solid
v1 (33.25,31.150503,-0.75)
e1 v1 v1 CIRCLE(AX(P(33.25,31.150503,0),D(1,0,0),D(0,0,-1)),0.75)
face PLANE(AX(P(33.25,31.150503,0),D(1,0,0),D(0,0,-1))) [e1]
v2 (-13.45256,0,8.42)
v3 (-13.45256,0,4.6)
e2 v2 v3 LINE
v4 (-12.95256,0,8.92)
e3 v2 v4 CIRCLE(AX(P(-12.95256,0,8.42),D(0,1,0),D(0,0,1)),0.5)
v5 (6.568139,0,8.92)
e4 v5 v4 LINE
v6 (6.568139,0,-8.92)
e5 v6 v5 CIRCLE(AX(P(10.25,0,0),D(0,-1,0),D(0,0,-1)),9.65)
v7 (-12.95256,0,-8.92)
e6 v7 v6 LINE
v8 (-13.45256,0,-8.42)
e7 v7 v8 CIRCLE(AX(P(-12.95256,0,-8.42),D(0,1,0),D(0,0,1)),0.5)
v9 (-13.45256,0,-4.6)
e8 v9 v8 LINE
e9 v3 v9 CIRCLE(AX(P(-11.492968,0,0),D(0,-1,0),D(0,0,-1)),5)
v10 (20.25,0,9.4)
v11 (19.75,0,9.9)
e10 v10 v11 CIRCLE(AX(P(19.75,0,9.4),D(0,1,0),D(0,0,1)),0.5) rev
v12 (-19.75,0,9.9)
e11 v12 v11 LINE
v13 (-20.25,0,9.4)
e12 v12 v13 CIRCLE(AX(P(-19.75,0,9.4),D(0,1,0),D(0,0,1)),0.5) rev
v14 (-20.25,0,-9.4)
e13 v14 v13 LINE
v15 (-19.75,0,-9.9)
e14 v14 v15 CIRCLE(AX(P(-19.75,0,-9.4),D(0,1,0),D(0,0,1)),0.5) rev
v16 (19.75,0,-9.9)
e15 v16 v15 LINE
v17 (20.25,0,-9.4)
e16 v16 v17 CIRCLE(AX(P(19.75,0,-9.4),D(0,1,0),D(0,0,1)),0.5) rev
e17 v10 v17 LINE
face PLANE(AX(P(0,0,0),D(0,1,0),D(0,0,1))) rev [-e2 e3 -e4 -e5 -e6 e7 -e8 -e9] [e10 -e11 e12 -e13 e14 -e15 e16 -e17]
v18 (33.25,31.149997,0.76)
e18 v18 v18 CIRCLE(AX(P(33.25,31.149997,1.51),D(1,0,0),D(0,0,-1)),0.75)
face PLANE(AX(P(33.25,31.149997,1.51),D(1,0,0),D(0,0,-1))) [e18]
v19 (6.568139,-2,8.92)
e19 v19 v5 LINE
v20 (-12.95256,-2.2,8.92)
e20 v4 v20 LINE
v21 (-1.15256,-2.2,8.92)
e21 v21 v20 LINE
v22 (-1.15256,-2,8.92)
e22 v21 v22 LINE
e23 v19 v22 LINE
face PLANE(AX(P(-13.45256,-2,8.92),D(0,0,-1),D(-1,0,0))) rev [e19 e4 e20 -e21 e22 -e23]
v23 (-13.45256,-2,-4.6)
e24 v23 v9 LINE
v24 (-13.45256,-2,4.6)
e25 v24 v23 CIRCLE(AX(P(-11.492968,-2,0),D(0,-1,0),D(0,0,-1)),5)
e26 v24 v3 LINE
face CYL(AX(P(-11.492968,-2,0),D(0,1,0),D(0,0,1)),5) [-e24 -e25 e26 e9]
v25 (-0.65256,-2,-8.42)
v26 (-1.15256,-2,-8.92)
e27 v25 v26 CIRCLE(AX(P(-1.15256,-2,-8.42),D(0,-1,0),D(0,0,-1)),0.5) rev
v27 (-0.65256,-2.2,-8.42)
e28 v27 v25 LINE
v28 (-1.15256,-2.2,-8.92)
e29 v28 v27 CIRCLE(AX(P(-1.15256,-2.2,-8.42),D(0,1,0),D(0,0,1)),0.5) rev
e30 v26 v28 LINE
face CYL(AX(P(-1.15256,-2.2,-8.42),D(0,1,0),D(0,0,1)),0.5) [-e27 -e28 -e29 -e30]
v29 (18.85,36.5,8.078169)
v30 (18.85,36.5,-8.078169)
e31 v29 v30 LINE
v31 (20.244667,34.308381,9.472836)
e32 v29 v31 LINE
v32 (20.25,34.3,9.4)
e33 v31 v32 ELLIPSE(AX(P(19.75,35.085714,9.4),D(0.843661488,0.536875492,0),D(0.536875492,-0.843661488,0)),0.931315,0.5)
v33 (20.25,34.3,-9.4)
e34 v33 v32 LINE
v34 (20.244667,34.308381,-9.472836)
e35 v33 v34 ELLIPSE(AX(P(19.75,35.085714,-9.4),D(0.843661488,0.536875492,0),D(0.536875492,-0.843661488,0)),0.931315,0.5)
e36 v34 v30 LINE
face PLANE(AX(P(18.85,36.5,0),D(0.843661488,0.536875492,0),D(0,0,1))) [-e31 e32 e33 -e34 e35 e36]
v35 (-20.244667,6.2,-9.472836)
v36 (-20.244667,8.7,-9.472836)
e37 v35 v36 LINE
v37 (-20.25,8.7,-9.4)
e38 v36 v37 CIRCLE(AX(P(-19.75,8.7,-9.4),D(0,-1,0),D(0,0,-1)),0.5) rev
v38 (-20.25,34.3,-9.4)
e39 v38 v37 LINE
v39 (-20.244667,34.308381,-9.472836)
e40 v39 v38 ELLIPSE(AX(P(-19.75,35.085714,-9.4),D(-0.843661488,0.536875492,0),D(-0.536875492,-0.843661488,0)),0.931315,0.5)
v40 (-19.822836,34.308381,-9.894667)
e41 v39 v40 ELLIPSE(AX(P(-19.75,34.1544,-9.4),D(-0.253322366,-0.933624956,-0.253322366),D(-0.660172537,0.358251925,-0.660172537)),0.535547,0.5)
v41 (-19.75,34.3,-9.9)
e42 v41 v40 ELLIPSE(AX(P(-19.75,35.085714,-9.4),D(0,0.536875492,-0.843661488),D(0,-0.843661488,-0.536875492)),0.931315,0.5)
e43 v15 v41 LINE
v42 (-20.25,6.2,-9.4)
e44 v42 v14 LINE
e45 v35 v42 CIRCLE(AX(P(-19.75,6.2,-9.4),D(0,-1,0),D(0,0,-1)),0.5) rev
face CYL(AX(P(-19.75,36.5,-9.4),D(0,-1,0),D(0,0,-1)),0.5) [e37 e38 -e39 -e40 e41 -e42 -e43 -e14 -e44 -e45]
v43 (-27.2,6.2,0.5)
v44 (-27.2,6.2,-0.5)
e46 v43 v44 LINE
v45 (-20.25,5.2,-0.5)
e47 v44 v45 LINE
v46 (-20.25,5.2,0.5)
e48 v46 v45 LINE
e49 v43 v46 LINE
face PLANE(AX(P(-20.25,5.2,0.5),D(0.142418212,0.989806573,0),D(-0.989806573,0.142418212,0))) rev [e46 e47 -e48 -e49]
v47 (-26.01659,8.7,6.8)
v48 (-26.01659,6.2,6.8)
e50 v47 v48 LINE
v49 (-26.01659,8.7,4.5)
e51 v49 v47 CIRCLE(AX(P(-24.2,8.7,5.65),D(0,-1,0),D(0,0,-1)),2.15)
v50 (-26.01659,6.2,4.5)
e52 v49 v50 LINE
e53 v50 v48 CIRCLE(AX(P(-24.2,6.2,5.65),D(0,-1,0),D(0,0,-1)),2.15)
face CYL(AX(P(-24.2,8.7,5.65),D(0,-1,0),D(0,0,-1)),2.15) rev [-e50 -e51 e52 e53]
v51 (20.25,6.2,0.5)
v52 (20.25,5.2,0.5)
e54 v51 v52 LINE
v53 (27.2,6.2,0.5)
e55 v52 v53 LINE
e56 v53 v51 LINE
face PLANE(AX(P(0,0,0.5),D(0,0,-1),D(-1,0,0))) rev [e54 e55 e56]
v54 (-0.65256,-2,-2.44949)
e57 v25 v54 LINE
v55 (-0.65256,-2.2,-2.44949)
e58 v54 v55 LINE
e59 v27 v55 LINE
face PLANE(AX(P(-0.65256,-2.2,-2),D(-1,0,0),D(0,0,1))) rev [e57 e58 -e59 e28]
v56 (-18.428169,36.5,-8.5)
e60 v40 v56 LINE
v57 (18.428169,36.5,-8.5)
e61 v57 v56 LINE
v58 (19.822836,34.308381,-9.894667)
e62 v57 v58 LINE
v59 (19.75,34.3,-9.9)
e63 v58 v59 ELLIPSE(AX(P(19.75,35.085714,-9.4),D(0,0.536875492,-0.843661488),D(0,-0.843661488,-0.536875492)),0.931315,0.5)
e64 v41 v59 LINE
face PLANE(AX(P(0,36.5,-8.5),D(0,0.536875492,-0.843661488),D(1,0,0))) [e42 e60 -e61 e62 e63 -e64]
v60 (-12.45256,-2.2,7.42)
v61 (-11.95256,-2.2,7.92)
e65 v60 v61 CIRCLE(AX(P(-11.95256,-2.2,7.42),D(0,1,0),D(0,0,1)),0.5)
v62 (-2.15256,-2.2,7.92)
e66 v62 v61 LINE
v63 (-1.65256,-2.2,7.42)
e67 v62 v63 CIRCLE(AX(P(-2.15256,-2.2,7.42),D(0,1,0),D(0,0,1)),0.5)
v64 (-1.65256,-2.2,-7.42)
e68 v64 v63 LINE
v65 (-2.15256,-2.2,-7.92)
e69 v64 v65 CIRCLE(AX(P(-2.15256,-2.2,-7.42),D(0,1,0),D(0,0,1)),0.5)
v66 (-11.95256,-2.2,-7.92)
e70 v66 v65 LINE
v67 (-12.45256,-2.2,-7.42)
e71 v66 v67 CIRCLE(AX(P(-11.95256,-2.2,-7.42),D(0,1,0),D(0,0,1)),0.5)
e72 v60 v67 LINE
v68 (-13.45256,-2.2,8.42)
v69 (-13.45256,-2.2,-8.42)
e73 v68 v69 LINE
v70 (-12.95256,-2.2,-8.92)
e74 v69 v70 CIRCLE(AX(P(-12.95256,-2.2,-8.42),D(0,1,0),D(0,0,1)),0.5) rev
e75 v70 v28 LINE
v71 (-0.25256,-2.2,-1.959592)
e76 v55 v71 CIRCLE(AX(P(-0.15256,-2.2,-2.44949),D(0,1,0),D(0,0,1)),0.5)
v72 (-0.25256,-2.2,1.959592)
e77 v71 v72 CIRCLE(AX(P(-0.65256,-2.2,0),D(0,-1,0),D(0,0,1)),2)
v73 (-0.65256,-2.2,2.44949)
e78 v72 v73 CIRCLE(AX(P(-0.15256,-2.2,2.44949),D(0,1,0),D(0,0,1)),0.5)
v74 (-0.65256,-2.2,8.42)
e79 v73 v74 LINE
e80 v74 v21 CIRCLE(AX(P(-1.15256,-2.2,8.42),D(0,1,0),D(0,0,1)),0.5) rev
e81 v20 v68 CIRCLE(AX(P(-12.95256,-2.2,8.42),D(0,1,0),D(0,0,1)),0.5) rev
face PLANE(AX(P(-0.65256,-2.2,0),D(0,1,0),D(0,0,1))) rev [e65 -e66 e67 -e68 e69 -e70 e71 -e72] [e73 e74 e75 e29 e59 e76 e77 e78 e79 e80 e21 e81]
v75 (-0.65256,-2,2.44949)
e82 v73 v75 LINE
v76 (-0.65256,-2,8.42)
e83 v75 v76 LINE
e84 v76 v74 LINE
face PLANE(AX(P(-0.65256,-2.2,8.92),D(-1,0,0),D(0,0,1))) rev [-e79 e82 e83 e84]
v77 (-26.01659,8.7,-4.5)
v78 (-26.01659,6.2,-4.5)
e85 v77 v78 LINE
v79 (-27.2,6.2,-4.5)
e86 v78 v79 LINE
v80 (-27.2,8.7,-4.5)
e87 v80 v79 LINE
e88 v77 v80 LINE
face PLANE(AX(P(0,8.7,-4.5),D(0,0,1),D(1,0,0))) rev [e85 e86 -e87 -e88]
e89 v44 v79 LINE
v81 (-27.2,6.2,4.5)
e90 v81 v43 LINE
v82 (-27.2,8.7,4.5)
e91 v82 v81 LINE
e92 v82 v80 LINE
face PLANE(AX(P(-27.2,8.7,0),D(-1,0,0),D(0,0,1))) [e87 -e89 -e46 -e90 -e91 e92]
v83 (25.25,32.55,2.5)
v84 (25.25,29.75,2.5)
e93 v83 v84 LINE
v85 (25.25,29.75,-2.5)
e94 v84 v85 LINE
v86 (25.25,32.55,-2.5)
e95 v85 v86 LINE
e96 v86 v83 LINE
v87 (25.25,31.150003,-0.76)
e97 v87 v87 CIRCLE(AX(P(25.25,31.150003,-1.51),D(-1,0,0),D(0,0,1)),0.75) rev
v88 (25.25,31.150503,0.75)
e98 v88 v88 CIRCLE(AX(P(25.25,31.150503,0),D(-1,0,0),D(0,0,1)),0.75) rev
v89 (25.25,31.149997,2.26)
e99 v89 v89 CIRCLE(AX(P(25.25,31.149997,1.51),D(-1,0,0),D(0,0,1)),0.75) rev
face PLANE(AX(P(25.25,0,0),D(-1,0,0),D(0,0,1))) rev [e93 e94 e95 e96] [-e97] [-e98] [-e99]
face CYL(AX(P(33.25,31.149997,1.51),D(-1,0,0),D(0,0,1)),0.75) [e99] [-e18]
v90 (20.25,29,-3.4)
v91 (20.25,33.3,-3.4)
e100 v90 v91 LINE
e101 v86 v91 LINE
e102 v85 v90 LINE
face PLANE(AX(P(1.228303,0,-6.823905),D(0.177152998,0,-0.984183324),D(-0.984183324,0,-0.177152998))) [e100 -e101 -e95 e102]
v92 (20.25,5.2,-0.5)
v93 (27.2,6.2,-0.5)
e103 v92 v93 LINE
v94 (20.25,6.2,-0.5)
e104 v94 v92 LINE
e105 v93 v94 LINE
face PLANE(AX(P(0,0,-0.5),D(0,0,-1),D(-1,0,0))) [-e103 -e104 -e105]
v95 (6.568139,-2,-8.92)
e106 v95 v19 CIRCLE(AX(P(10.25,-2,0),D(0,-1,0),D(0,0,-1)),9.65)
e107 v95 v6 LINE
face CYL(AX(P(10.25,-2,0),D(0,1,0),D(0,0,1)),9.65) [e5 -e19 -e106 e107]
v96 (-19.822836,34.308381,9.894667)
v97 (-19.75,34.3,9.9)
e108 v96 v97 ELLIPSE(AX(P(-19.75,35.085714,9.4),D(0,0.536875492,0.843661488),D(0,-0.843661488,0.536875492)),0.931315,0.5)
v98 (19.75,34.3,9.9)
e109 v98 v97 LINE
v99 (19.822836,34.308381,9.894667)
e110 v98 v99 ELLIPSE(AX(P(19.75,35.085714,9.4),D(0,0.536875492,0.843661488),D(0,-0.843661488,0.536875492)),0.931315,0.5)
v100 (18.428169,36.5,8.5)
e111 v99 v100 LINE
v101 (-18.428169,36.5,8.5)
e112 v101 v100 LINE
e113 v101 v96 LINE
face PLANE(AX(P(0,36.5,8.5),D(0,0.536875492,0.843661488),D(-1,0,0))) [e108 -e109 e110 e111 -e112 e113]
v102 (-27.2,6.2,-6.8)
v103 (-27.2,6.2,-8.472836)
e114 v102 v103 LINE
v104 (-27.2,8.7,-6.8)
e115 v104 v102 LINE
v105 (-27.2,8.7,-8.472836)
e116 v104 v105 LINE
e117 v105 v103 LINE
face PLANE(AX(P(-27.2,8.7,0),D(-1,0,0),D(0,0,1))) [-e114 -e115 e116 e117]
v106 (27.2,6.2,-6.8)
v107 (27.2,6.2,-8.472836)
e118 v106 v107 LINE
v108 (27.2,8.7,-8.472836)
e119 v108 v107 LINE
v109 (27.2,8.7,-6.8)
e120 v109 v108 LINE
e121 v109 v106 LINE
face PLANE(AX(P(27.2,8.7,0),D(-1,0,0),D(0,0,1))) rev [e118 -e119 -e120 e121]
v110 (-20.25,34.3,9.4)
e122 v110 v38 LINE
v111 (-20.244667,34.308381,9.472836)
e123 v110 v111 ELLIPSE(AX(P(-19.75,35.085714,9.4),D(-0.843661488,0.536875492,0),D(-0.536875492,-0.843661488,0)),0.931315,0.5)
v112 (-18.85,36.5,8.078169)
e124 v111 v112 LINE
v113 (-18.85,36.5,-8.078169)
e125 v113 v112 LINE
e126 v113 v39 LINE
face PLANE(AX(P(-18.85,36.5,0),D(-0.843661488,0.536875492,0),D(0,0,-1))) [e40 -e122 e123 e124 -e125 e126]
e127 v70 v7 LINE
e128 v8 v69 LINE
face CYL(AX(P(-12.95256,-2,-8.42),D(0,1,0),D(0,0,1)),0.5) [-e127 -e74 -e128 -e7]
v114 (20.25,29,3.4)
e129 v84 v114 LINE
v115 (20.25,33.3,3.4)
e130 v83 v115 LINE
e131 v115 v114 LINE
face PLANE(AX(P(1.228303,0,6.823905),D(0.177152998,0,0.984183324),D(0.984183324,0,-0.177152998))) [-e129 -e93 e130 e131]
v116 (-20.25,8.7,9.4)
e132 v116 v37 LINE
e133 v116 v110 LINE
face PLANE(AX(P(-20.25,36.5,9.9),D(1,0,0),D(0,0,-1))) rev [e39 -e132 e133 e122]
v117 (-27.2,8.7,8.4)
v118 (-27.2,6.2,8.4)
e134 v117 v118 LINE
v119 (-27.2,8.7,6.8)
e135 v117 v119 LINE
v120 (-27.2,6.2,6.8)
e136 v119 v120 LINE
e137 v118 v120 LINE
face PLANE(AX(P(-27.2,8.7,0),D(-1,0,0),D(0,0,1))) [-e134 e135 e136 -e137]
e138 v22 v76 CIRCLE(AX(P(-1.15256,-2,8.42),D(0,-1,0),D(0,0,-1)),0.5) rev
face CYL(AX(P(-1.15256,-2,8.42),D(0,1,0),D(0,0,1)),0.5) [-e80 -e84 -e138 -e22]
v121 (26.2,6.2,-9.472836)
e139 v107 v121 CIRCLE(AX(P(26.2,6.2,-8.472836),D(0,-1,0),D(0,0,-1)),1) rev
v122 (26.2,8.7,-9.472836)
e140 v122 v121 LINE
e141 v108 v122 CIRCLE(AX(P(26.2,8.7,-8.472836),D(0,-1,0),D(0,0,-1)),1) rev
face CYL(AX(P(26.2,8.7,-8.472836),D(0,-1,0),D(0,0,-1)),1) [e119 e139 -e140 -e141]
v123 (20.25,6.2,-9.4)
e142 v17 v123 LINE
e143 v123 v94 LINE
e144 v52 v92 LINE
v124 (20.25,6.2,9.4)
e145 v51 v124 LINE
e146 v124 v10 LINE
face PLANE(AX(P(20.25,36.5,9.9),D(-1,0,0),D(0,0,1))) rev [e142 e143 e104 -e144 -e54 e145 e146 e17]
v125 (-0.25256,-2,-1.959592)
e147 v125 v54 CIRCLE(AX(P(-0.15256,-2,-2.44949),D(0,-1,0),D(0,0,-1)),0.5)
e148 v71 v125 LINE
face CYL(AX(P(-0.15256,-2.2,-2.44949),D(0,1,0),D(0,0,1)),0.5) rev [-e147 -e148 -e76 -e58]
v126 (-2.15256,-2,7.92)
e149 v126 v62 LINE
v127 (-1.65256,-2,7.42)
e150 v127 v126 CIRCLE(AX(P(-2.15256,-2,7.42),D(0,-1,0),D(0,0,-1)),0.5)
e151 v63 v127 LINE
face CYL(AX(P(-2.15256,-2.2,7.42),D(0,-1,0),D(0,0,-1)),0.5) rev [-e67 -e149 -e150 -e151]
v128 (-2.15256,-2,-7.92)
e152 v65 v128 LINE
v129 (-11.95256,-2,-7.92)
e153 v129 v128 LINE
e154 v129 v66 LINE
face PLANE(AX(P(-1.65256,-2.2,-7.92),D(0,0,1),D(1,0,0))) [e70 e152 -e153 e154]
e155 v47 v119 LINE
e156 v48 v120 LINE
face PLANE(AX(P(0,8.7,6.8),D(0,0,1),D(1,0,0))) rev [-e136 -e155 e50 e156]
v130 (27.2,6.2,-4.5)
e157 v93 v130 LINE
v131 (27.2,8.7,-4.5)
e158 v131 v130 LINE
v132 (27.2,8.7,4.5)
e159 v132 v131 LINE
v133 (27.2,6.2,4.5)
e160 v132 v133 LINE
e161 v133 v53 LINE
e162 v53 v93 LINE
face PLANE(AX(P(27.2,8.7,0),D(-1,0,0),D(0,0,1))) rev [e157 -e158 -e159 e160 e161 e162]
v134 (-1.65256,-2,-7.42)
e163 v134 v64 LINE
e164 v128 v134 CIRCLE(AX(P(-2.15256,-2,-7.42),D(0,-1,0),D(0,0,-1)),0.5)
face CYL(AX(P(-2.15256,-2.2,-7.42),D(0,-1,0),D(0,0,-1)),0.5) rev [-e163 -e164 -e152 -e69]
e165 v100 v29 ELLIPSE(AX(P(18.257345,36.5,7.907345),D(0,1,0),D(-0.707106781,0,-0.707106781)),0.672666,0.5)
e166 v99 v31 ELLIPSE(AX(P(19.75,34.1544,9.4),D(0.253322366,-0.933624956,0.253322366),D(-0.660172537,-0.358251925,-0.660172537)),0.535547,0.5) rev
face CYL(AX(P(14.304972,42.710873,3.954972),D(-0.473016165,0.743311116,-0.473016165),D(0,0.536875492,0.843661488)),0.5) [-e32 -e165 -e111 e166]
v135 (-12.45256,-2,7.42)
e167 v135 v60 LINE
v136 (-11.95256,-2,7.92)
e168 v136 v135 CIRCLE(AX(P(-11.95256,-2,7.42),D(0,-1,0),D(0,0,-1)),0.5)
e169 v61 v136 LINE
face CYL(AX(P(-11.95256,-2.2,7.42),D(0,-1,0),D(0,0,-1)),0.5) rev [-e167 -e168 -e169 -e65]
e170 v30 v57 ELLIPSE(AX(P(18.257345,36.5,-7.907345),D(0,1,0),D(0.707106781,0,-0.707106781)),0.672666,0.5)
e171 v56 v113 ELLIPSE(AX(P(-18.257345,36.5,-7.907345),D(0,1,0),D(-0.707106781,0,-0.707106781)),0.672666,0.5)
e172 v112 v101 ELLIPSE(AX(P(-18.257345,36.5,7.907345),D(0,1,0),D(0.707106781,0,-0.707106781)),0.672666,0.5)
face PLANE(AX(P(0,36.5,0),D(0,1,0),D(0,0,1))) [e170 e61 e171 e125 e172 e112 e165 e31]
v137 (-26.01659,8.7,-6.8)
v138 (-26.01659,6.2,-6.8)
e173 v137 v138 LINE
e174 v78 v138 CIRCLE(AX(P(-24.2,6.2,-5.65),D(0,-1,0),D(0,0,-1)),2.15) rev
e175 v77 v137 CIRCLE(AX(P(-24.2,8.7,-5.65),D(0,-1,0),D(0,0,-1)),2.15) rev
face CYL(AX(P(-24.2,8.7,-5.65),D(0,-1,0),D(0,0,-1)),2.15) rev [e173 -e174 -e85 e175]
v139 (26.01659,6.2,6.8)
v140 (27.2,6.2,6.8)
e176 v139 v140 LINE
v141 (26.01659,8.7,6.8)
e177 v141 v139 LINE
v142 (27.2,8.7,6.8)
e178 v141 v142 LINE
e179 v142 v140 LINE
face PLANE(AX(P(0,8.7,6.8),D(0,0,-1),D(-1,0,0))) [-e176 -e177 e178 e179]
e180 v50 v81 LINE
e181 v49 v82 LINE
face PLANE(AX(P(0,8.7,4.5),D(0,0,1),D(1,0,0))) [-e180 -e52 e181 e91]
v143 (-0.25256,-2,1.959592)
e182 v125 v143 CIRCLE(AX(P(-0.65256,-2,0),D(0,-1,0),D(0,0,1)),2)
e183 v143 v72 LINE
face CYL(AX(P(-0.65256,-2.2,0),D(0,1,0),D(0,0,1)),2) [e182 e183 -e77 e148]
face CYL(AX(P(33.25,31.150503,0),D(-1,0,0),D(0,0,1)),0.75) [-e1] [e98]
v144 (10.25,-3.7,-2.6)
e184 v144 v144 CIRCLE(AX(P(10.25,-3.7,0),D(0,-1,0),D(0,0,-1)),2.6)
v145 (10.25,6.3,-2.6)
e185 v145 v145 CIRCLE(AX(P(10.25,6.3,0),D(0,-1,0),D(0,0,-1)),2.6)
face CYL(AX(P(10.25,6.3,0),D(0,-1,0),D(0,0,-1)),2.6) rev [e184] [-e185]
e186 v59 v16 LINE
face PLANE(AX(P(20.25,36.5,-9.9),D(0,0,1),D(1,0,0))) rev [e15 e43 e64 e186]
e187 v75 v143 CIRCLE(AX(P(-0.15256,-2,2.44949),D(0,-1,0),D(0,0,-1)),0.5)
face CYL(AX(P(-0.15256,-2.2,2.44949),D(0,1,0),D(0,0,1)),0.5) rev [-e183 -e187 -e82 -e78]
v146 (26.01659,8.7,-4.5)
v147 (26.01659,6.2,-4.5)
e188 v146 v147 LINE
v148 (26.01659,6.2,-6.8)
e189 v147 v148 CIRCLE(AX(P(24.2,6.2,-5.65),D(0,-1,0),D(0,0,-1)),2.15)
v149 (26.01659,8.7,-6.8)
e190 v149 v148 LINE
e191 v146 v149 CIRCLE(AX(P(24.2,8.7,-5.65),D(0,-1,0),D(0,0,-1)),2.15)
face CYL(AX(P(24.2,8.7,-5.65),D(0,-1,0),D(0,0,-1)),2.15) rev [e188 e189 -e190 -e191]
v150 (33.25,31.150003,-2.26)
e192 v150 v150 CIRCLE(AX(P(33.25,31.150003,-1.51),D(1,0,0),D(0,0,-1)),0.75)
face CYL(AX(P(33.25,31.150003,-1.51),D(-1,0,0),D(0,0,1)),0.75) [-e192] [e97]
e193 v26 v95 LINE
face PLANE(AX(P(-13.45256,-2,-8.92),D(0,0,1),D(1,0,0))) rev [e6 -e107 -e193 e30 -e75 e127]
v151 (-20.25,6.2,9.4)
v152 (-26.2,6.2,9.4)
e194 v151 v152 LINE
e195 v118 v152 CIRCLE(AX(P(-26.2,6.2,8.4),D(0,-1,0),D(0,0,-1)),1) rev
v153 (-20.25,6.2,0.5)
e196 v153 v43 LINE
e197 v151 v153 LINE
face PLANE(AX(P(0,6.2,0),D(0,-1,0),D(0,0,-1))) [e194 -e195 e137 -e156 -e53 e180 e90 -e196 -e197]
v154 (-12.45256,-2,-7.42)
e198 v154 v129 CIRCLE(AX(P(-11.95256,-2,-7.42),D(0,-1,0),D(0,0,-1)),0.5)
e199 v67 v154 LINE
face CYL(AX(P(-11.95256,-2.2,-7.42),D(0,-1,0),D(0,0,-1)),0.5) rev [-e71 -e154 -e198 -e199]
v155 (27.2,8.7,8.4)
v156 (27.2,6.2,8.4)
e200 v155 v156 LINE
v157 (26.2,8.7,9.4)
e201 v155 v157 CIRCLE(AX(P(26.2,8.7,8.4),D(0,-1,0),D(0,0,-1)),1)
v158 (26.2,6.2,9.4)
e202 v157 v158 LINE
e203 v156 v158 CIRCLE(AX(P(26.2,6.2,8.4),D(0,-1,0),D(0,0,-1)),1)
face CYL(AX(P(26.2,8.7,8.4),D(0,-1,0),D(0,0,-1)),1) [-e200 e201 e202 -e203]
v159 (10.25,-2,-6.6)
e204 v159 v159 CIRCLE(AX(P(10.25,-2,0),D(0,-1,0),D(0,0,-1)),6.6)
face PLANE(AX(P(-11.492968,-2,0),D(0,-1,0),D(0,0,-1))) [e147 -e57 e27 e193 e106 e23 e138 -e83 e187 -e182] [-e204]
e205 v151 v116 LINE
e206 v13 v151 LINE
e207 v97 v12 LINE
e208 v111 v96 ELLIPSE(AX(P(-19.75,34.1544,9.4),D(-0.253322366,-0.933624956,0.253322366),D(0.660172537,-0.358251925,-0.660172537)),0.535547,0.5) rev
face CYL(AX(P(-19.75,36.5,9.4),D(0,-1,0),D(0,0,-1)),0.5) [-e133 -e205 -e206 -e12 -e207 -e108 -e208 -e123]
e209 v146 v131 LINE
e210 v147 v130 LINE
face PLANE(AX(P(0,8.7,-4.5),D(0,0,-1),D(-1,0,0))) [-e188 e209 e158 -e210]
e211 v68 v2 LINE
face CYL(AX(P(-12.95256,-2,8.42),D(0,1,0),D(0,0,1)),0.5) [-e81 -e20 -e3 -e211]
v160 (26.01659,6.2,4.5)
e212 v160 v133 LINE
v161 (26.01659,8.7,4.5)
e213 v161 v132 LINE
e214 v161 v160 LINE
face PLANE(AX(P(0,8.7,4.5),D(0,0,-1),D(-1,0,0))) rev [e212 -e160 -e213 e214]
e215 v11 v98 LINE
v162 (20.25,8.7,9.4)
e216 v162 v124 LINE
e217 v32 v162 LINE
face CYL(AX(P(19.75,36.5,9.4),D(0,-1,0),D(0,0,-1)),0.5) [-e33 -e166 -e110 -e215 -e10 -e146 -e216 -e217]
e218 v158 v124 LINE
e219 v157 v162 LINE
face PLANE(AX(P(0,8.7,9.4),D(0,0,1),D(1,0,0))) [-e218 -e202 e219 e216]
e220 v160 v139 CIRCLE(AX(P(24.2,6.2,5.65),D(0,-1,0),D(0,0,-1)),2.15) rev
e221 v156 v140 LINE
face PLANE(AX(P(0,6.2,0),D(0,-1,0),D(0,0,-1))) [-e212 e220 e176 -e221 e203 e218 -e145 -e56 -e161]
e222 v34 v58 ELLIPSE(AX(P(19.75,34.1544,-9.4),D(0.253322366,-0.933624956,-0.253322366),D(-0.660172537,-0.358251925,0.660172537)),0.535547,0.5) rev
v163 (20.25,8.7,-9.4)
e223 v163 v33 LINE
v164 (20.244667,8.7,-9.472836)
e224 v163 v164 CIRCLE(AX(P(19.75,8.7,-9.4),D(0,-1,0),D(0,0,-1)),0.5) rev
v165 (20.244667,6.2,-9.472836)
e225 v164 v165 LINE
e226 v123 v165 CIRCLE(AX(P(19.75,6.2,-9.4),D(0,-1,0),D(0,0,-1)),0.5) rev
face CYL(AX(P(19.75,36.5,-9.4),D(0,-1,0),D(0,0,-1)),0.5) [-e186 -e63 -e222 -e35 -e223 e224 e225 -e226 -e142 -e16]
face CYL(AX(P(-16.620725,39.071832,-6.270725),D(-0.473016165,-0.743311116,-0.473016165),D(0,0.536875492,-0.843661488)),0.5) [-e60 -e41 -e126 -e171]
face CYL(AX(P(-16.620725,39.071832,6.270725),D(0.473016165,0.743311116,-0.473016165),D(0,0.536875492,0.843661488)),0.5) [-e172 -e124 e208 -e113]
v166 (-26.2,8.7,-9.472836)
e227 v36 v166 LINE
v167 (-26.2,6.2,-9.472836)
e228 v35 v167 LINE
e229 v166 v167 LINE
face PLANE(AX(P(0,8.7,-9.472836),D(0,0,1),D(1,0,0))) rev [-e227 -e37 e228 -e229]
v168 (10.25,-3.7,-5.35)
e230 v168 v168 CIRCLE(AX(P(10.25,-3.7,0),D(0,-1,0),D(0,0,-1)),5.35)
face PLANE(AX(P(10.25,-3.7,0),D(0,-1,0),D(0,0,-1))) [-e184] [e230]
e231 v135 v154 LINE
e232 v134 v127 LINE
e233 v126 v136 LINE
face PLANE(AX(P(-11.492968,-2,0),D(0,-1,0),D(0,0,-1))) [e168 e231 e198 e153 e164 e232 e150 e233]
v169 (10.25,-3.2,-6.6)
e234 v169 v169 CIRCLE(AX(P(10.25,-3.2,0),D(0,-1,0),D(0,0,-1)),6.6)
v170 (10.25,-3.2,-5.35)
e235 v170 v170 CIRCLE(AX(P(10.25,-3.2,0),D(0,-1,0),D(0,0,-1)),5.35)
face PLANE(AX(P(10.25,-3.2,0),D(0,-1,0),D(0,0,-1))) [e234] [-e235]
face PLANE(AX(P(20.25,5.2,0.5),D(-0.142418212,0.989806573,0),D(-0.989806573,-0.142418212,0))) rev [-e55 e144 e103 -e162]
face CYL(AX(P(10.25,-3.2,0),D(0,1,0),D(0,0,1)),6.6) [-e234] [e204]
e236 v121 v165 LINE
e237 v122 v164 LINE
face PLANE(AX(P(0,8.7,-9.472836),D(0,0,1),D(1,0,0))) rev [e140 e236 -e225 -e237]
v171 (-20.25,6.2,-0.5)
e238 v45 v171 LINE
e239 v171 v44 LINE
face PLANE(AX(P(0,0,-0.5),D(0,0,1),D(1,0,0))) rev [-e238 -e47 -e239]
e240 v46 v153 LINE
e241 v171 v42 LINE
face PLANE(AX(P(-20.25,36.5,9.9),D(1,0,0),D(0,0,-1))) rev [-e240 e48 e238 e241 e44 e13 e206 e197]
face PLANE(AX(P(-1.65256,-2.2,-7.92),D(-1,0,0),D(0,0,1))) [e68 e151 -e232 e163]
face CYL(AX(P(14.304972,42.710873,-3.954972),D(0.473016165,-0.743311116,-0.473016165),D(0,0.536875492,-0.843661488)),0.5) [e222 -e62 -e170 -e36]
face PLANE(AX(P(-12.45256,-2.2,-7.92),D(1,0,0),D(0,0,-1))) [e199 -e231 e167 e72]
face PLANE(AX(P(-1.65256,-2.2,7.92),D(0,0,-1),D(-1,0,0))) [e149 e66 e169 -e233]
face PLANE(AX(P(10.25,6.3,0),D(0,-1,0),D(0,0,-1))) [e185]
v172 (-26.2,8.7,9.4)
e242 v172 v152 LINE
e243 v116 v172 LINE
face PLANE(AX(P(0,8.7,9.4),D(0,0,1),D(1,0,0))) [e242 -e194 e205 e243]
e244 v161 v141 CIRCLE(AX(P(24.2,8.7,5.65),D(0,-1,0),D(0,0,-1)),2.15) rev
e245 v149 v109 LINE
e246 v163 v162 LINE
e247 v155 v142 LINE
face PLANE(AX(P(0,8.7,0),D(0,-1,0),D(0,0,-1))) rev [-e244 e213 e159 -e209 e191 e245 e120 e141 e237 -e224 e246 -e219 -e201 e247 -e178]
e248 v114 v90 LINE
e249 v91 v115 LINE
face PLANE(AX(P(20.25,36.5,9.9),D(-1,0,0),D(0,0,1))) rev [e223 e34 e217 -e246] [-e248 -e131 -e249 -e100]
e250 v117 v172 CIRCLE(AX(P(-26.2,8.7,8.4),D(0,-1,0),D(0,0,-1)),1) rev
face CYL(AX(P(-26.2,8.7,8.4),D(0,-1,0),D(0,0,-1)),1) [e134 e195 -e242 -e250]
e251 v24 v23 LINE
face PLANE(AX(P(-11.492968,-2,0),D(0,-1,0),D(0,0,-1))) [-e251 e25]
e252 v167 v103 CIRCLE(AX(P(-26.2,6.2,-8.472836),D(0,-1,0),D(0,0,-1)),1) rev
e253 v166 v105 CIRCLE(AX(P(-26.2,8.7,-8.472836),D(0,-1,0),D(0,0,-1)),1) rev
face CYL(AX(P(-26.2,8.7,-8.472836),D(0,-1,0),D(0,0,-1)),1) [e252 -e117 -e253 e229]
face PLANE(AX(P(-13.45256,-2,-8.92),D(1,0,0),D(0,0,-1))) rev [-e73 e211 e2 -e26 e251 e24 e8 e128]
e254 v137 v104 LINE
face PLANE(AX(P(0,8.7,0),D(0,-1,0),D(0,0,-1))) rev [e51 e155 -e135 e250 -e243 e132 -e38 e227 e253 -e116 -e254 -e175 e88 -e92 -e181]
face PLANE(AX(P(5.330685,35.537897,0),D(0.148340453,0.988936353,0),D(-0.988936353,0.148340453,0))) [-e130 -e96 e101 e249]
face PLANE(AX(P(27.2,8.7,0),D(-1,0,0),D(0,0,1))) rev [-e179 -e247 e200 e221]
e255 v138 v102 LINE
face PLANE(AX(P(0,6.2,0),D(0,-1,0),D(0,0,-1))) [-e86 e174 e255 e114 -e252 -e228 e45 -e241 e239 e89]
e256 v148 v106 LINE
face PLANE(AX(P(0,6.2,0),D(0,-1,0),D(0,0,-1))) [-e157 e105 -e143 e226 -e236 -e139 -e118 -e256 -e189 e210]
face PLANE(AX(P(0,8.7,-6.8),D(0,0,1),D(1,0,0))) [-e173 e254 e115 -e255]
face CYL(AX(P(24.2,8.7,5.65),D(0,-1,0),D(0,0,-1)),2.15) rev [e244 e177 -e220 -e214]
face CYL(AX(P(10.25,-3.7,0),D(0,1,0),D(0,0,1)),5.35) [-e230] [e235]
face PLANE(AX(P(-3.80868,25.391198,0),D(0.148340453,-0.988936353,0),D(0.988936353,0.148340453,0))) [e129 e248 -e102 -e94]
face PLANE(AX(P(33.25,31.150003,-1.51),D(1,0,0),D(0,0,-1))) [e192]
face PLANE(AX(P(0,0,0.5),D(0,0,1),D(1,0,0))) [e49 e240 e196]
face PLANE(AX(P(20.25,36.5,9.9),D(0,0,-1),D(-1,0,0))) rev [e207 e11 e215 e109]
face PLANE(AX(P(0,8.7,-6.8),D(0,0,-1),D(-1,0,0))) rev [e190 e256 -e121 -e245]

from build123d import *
from OCP.BRepFilletAPI import BRepFilletAPI_MakeChamfer

# Parameters (mm, degrees)
SKETCH_1_W       = 40.5
SKETCH_1_H       = 19.8
BODY_DEPTH       = 36.5
CHAMFER_1_SIZE   = 2.2
CHAMFER_1_SIZE2  = 1.4
FILLET_1_R       = 0.5
MOUNT_DEPTH      = 2.5
EXTRUDE_3_DEPTH  = 0.5
EXTRUDE_4_DEPTH  = 2
SKETCH_5_W       = 10.8
SKETCH_5_H       = 15.84
EXTRUDE_5_DEPTH  = 0.2
SKETCH_6_R       = 6.6
EXTRUDE_6_DEPTH  = 1.2
SKETCH_7_R       = 5.35
EXTRUDE_7_DEPTH  = 0.5
SKETCH_8_R       = 2.6
SHAFT_HOLE_DEPTH = 10
FILLET_2_R       = 0.5
SKETCH_11_R      = 0.75
EXTRUDE_10_DEPTH = 8


with BuildPart() as part:
    # Эскиз1 → Body (new body)
    with BuildSketch(Plane(origin=(0, 0, 0), x_dir=(1, 0, 0), z_dir=(0, 1, 0))):
        Rectangle(SKETCH_1_W, SKETCH_1_H)
    extrude(amount=BODY_DEPTH)

    # Фаска1: one chamfer whose edges measure the first distance from different faces: ONE call of the kernel's chamfer builder (chamfer() names one face for all edges)
    chamfer_1_edges_1 = [part.edges().sort_by_distance(p)[0] for p in [
        (20.25, 36.5, 0),
    ]]
    chamfer_1_side_1 = [part.faces().sort_by_distance(p)[0] for p in [
        (20.25, 18.25, 0),
    ]]
    chamfer_1_edges_2 = [part.edges().sort_by_distance(p)[0] for p in [
        (0, 36.5, -9.9),
    ]]
    chamfer_1_side_2 = [part.faces().sort_by_distance(p)[0] for p in [
        (0, 18.25, -9.9),
    ]]
    chamfer_1_edges_3 = [part.edges().sort_by_distance(p)[0] for p in [
        (-20.25, 36.5, 0),
    ]]
    chamfer_1_side_3 = [part.faces().sort_by_distance(p)[0] for p in [
        (-20.25, 18.25, 0),
    ]]
    chamfer_1_edges_4 = [part.edges().sort_by_distance(p)[0] for p in [
        (0, 36.5, 9.9),
    ]]
    chamfer_1_side_4 = [part.faces().sort_by_distance(p)[0] for p in [
        (0, 18.25, 9.9),
    ]]
    chamfer_1 = BRepFilletAPI_MakeChamfer(part.part.solid().wrapped)
    for e in chamfer_1_edges_1:
        chamfer_1.Add(CHAMFER_1_SIZE, CHAMFER_1_SIZE2, e.wrapped, chamfer_1_side_1[0].wrapped)  # the first distance lies on this face
    for e in chamfer_1_edges_2:
        chamfer_1.Add(CHAMFER_1_SIZE, CHAMFER_1_SIZE2, e.wrapped, chamfer_1_side_2[0].wrapped)  # the first distance lies on this face
    for e in chamfer_1_edges_3:
        chamfer_1.Add(CHAMFER_1_SIZE, CHAMFER_1_SIZE2, e.wrapped, chamfer_1_side_3[0].wrapped)  # the first distance lies on this face
    for e in chamfer_1_edges_4:
        chamfer_1.Add(CHAMFER_1_SIZE, CHAMFER_1_SIZE2, e.wrapped, chamfer_1_side_4[0].wrapped)  # the first distance lies on this face
    add(Compound.cast(chamfer_1.Shape()), mode=Mode.REPLACE)

    # Скругление1
    # the kernel refuses this fillet: 0.5 mm, written as the material it takes off along each edge
    with BuildSketch(Plane(origin=(-20.25, -1.25, 9.9), x_dir=(1, 0, 0), z_dir=(0, 1, 0)), Plane(origin=(-20.25, -1.25, -9.9), x_dir=(0, 0, 1), z_dir=(0, 1, 0))) as fillet_1_piece_1:
        with BuildLine():
            CenterArc((FILLET_1_R, FILLET_1_R), FILLET_1_R, 180, 90)
            Line((0, FILLET_1_R), (0, 0))
            Line((0, 0), (FILLET_1_R, 0))
        make_face()
    extrude(amount=36.8, mode=Mode.SUBTRACT)
    with BuildSketch(Plane(origin=(20.25, -1.25, -9.9), x_dir=(0, 0, 1), z_dir=(0, 1, 0)), Plane(origin=(20.25, -1.25, 9.9), x_dir=(-1, 0, 0), z_dir=(0, 1, 0))) as fillet_1_piece_2:
        with BuildLine():
            CenterArc((FILLET_1_R, -FILLET_1_R), FILLET_1_R, 90, 90)
            Line((0, -FILLET_1_R), (0, 0))
            Line((0, 0), (FILLET_1_R, 0))
        make_face()
    extrude(amount=36.8, mode=Mode.SUBTRACT)
    with BuildSketch(Plane(origin=(20.689497717, 33.609360731, -10.339497717), x_dir=(0.25395078633508533, -0.3990655213836877, 0.8810537485094523), z_dir=(-0.47301616487963943, 0.7433111162394352, 0.47301616487964004)), Plane(origin=(20.689497717, 33.609360731, 10.339497717), x_dir=(-0.8810537485094526, -0.39906552138369156, 0.25395078633507817), z_dir=(-0.47301616487963943, 0.7433111162394352, -0.47301616487964004))) as fillet_1_piece_3:
        with BuildLine():
            CenterArc((FILLET_1_R * 0.743311116239, -FILLET_1_R), FILLET_1_R, 90, 73.247664886)
            Line((-FILLET_1_R * 0.21424849821, -FILLET_1_R * 0.711764705882), (0, 0))
            Line((0, 0), (FILLET_1_R * 0.743311116239, 0))
        make_face()
    extrude(amount=4.818007508, mode=Mode.SUBTRACT)
    with BuildSketch(Plane(origin=(-20.689497717, 33.609360731, -10.339497717), x_dir=(-0.25395078633507856, -0.3990655213836921, 0.8810537485094524), z_dir=(0.47301616487963943, 0.7433111162394352, 0.47301616487964004)), Plane(origin=(-20.689497717, 33.609360731, 10.339497717), x_dir=(0.8810537485094527, -0.3990655213836916, 0.25395078633507817), z_dir=(0.47301616487963943, 0.7433111162394352, -0.47301616487964004))) as fillet_1_piece_4:
        with BuildLine():
            CenterArc((FILLET_1_R * 0.743311116239, FILLET_1_R), FILLET_1_R, 196.752335114, 73.247664886)
            Line((-FILLET_1_R * 0.21424849821, FILLET_1_R * 0.711764705882), (0, 0))
            Line((0, 0), (FILLET_1_R * 0.743311116239, 0))
        make_face()
    extrude(amount=4.818007508, mode=Mode.SUBTRACT)

    # Эскиз2 → Mount (add)
    with BuildSketch(Plane(origin=(0, 6.2, 0), x_dir=(-1, 0, 0), z_dir=(0, -1, 0))):
        with BuildLine():
            Line((-26.2, 9.472835762), (26.2, 9.472835762))
            ThreePointArc((26.2, 9.472835762), (26.907106781, 9.179942543), (27.2, 8.472835762))
            Line((27.2, 8.472835762), (27.2, 6.8))
            Line((27.2, 6.8), (26.016590212, 6.8))
            ThreePointArc((26.016590212, 6.8), (22.05, 5.65), (26.016590212, 4.5))
            Line((26.016590212, 4.5), (27.2, 4.5))
            Line((27.2, 4.5), (27.2, -4.5))
            Line((27.2, -4.5), (26.016590212, -4.5))
            ThreePointArc((26.016590212, -4.5), (22.05, -5.65), (26.016590212, -6.8))
            Line((26.016590212, -6.8), (27.2, -6.8))
            Line((27.2, -6.8), (27.2, -8.4))
            ThreePointArc((27.2, -8.4), (26.907106781, -9.107106781), (26.2, -9.4))
            Line((26.2, -9.4), (-26.2, -9.4))
            ThreePointArc((-26.2, -9.4), (-26.907106781, -9.107106781), (-27.2, -8.4))
            Line((-27.2, -8.4), (-27.2, -6.8))
            Line((-27.2, -6.8), (-26.016590212, -6.8))
            ThreePointArc((-26.016590212, -6.8), (-22.05, -5.65), (-26.016590212, -4.5))
            Line((-26.016590212, -4.5), (-27.2, -4.5))
            Line((-27.2, -4.5), (-27.2, 4.5))
            Line((-27.2, 4.5), (-26.016590212, 4.5))
            ThreePointArc((-26.016590212, 4.5), (-22.05, 5.65), (-26.016590212, 6.8))
            Line((-26.016590212, 6.8), (-27.2, 6.8))
            Line((-27.2, 6.8), (-27.2, 8.472835762))
            ThreePointArc((-27.2, 8.472835762), (-26.907106781, 9.179942543), (-26.2, 9.472835762))
        make_face()
    extrude(amount=-MOUNT_DEPTH)

    # Эскиз3 → Бобышка-Вытянуть3 (add, symmetric)
    with BuildSketch(Plane.XY):
        Polygon((-27.2, 6.2), (-20.25, 6.2), (-20.25, 5.2), align=None)
        Polygon((20.25, 5.2), (27.2, 6.2), (20.25, 6.2), align=None)
    extrude(amount=EXTRUDE_3_DEPTH, both=True)

    # Эскиз4 → Бобышка-Вытянуть4 (add)
    with BuildSketch(Plane.XZ):
        with BuildLine():
            Line((-13.452560024, -8.92), (-13.452560024, -4.6))
            ThreePointArc((-13.452560024, -4.6), (-16.49296823, 0), (-13.452560024, 4.6))
            Line((-13.452560024, 4.6), (-13.452560024, 8.92))
            Line((-13.452560024, 8.92), (6.568139057, 8.92))
            ThreePointArc((6.568139057, 8.92), (19.9, 0), (6.568139057, -8.92))
            Line((6.568139057, -8.92), (-13.452560024, -8.92))
        make_face()
    extrude(amount=EXTRUDE_4_DEPTH)

    # Эскиз5 → Бобышка-Вытянуть5 (add)
    with BuildSketch(Plane.XZ.offset(2)):
        with BuildLine():
            Line((-13.452560024, 8.92), (-0.652560024, 8.92))
            Line((-0.652560024, 8.92), (-0.652560024, 2))
            ThreePointArc((-0.652560024, 2), (1.347439976, 0), (-0.652560024, -2))
            Line((-0.652560024, -2), (-0.652560024, -8.92))
            Line((-0.652560024, -8.92), (-13.452560024, -8.92))
            Line((-13.452560024, -8.92), (-13.452560024, 8.92))
        make_face()
        with Locations((-7.052560024, 0)):
            Rectangle(SKETCH_5_W, SKETCH_5_H, mode=Mode.SUBTRACT)
    extrude(amount=EXTRUDE_5_DEPTH)

    # Эскиз6 → Бобышка-Вытянуть6 (add)
    with BuildSketch(Plane.XZ.offset(2)):
        with Locations(Location((10.25, 0, 0), (0, 0, 270))):
            Circle(SKETCH_6_R)
    extrude(amount=EXTRUDE_6_DEPTH)

    # Эскиз7 → Бобышка-Вытянуть7 (add)
    with BuildSketch(Plane.XZ.offset(3.2)):
        with Locations(Location((10.25, 0, 0), (0, 0, 270))):
            Circle(SKETCH_7_R)
    extrude(amount=EXTRUDE_7_DEPTH)

    # Эскиз8 → Shaft hole (cut)
    with BuildSketch(Plane.XZ.offset(3.7)):
        with Locations(Location((10.25, 0, 0), (0, 0, 270))):
            Circle(SKETCH_8_R)
    extrude(amount=-SHAFT_HOLE_DEPTH, mode=Mode.SUBTRACT)

    # Скругление2
    fillet_2_edges = [part.edges().sort_by_distance(p)[0] for p in [
        (-13.452560024, -1.1, 8.92),
        (-0.652560024, -2.1, 2),
        (-0.652560024, -2.1, -2),
        (-0.652560024, -2.1, 8.92),
        (-0.652560024, -2.1, -8.92),
        (-13.452560024, -1.1, -8.92),
        (-1.652560024, -2.1, 7.92),
        (-1.652560024, -2.1, -7.92),
        (-12.452560024, -2.1, 7.92),
        (-12.452560024, -2.1, -7.92),
    ]]
    fillet(fillet_2_edges, radius=FILLET_2_R)

    # Эскиз10 → Rubber section 0
    with BuildSketch(Plane(origin=(25.25, 0, 0), x_dir=(0, 0, -1), z_dir=(1, 0, 0))):
        with BuildLine():
            Line((-2.5, 29.75), (2.5, 29.75))
            Line((2.5, 29.75), (2.5, 32.55))
            Line((2.5, 32.55), (-2.5, 32.55))
            Line((-2.5, 32.55), (-2.5, 29.75))
        make_face()
    # Эскиз9 → Rubber section 1
    with BuildSketch(Plane(origin=(20.25, 0, 0), x_dir=(0, 0, -1), z_dir=(1, 0, 0))):
        with BuildLine():
            Line((-3.4, 33.3), (3.4, 33.3))
            Line((3.4, 33.3), (3.4, 29))
            Line((3.4, 29), (-3.4, 29))
            Line((-3.4, 29), (-3.4, 33.3))
        make_face()
    loft()

    # Эскиз11 → Бобышка-Вытянуть10 (add)
    with BuildSketch(Plane(origin=(25.25, 0, 0), x_dir=(0, 0, -1), z_dir=(1, 0, 0))):
        with Locations(Location((0, 31.150503064, 0), (0, 0, 180))):
            Circle(SKETCH_11_R)
        with Locations(Location((1.509999917, 31.15000331, 0), (0, 0, 180))):
            Circle(SKETCH_11_R)
        with Locations(Location((-1.509999915, 31.149996646, 0), (0, 0, 180))):
            Circle(SKETCH_11_R)
    extrude(amount=EXTRUDE_10_DEPTH)


solid = part.part
